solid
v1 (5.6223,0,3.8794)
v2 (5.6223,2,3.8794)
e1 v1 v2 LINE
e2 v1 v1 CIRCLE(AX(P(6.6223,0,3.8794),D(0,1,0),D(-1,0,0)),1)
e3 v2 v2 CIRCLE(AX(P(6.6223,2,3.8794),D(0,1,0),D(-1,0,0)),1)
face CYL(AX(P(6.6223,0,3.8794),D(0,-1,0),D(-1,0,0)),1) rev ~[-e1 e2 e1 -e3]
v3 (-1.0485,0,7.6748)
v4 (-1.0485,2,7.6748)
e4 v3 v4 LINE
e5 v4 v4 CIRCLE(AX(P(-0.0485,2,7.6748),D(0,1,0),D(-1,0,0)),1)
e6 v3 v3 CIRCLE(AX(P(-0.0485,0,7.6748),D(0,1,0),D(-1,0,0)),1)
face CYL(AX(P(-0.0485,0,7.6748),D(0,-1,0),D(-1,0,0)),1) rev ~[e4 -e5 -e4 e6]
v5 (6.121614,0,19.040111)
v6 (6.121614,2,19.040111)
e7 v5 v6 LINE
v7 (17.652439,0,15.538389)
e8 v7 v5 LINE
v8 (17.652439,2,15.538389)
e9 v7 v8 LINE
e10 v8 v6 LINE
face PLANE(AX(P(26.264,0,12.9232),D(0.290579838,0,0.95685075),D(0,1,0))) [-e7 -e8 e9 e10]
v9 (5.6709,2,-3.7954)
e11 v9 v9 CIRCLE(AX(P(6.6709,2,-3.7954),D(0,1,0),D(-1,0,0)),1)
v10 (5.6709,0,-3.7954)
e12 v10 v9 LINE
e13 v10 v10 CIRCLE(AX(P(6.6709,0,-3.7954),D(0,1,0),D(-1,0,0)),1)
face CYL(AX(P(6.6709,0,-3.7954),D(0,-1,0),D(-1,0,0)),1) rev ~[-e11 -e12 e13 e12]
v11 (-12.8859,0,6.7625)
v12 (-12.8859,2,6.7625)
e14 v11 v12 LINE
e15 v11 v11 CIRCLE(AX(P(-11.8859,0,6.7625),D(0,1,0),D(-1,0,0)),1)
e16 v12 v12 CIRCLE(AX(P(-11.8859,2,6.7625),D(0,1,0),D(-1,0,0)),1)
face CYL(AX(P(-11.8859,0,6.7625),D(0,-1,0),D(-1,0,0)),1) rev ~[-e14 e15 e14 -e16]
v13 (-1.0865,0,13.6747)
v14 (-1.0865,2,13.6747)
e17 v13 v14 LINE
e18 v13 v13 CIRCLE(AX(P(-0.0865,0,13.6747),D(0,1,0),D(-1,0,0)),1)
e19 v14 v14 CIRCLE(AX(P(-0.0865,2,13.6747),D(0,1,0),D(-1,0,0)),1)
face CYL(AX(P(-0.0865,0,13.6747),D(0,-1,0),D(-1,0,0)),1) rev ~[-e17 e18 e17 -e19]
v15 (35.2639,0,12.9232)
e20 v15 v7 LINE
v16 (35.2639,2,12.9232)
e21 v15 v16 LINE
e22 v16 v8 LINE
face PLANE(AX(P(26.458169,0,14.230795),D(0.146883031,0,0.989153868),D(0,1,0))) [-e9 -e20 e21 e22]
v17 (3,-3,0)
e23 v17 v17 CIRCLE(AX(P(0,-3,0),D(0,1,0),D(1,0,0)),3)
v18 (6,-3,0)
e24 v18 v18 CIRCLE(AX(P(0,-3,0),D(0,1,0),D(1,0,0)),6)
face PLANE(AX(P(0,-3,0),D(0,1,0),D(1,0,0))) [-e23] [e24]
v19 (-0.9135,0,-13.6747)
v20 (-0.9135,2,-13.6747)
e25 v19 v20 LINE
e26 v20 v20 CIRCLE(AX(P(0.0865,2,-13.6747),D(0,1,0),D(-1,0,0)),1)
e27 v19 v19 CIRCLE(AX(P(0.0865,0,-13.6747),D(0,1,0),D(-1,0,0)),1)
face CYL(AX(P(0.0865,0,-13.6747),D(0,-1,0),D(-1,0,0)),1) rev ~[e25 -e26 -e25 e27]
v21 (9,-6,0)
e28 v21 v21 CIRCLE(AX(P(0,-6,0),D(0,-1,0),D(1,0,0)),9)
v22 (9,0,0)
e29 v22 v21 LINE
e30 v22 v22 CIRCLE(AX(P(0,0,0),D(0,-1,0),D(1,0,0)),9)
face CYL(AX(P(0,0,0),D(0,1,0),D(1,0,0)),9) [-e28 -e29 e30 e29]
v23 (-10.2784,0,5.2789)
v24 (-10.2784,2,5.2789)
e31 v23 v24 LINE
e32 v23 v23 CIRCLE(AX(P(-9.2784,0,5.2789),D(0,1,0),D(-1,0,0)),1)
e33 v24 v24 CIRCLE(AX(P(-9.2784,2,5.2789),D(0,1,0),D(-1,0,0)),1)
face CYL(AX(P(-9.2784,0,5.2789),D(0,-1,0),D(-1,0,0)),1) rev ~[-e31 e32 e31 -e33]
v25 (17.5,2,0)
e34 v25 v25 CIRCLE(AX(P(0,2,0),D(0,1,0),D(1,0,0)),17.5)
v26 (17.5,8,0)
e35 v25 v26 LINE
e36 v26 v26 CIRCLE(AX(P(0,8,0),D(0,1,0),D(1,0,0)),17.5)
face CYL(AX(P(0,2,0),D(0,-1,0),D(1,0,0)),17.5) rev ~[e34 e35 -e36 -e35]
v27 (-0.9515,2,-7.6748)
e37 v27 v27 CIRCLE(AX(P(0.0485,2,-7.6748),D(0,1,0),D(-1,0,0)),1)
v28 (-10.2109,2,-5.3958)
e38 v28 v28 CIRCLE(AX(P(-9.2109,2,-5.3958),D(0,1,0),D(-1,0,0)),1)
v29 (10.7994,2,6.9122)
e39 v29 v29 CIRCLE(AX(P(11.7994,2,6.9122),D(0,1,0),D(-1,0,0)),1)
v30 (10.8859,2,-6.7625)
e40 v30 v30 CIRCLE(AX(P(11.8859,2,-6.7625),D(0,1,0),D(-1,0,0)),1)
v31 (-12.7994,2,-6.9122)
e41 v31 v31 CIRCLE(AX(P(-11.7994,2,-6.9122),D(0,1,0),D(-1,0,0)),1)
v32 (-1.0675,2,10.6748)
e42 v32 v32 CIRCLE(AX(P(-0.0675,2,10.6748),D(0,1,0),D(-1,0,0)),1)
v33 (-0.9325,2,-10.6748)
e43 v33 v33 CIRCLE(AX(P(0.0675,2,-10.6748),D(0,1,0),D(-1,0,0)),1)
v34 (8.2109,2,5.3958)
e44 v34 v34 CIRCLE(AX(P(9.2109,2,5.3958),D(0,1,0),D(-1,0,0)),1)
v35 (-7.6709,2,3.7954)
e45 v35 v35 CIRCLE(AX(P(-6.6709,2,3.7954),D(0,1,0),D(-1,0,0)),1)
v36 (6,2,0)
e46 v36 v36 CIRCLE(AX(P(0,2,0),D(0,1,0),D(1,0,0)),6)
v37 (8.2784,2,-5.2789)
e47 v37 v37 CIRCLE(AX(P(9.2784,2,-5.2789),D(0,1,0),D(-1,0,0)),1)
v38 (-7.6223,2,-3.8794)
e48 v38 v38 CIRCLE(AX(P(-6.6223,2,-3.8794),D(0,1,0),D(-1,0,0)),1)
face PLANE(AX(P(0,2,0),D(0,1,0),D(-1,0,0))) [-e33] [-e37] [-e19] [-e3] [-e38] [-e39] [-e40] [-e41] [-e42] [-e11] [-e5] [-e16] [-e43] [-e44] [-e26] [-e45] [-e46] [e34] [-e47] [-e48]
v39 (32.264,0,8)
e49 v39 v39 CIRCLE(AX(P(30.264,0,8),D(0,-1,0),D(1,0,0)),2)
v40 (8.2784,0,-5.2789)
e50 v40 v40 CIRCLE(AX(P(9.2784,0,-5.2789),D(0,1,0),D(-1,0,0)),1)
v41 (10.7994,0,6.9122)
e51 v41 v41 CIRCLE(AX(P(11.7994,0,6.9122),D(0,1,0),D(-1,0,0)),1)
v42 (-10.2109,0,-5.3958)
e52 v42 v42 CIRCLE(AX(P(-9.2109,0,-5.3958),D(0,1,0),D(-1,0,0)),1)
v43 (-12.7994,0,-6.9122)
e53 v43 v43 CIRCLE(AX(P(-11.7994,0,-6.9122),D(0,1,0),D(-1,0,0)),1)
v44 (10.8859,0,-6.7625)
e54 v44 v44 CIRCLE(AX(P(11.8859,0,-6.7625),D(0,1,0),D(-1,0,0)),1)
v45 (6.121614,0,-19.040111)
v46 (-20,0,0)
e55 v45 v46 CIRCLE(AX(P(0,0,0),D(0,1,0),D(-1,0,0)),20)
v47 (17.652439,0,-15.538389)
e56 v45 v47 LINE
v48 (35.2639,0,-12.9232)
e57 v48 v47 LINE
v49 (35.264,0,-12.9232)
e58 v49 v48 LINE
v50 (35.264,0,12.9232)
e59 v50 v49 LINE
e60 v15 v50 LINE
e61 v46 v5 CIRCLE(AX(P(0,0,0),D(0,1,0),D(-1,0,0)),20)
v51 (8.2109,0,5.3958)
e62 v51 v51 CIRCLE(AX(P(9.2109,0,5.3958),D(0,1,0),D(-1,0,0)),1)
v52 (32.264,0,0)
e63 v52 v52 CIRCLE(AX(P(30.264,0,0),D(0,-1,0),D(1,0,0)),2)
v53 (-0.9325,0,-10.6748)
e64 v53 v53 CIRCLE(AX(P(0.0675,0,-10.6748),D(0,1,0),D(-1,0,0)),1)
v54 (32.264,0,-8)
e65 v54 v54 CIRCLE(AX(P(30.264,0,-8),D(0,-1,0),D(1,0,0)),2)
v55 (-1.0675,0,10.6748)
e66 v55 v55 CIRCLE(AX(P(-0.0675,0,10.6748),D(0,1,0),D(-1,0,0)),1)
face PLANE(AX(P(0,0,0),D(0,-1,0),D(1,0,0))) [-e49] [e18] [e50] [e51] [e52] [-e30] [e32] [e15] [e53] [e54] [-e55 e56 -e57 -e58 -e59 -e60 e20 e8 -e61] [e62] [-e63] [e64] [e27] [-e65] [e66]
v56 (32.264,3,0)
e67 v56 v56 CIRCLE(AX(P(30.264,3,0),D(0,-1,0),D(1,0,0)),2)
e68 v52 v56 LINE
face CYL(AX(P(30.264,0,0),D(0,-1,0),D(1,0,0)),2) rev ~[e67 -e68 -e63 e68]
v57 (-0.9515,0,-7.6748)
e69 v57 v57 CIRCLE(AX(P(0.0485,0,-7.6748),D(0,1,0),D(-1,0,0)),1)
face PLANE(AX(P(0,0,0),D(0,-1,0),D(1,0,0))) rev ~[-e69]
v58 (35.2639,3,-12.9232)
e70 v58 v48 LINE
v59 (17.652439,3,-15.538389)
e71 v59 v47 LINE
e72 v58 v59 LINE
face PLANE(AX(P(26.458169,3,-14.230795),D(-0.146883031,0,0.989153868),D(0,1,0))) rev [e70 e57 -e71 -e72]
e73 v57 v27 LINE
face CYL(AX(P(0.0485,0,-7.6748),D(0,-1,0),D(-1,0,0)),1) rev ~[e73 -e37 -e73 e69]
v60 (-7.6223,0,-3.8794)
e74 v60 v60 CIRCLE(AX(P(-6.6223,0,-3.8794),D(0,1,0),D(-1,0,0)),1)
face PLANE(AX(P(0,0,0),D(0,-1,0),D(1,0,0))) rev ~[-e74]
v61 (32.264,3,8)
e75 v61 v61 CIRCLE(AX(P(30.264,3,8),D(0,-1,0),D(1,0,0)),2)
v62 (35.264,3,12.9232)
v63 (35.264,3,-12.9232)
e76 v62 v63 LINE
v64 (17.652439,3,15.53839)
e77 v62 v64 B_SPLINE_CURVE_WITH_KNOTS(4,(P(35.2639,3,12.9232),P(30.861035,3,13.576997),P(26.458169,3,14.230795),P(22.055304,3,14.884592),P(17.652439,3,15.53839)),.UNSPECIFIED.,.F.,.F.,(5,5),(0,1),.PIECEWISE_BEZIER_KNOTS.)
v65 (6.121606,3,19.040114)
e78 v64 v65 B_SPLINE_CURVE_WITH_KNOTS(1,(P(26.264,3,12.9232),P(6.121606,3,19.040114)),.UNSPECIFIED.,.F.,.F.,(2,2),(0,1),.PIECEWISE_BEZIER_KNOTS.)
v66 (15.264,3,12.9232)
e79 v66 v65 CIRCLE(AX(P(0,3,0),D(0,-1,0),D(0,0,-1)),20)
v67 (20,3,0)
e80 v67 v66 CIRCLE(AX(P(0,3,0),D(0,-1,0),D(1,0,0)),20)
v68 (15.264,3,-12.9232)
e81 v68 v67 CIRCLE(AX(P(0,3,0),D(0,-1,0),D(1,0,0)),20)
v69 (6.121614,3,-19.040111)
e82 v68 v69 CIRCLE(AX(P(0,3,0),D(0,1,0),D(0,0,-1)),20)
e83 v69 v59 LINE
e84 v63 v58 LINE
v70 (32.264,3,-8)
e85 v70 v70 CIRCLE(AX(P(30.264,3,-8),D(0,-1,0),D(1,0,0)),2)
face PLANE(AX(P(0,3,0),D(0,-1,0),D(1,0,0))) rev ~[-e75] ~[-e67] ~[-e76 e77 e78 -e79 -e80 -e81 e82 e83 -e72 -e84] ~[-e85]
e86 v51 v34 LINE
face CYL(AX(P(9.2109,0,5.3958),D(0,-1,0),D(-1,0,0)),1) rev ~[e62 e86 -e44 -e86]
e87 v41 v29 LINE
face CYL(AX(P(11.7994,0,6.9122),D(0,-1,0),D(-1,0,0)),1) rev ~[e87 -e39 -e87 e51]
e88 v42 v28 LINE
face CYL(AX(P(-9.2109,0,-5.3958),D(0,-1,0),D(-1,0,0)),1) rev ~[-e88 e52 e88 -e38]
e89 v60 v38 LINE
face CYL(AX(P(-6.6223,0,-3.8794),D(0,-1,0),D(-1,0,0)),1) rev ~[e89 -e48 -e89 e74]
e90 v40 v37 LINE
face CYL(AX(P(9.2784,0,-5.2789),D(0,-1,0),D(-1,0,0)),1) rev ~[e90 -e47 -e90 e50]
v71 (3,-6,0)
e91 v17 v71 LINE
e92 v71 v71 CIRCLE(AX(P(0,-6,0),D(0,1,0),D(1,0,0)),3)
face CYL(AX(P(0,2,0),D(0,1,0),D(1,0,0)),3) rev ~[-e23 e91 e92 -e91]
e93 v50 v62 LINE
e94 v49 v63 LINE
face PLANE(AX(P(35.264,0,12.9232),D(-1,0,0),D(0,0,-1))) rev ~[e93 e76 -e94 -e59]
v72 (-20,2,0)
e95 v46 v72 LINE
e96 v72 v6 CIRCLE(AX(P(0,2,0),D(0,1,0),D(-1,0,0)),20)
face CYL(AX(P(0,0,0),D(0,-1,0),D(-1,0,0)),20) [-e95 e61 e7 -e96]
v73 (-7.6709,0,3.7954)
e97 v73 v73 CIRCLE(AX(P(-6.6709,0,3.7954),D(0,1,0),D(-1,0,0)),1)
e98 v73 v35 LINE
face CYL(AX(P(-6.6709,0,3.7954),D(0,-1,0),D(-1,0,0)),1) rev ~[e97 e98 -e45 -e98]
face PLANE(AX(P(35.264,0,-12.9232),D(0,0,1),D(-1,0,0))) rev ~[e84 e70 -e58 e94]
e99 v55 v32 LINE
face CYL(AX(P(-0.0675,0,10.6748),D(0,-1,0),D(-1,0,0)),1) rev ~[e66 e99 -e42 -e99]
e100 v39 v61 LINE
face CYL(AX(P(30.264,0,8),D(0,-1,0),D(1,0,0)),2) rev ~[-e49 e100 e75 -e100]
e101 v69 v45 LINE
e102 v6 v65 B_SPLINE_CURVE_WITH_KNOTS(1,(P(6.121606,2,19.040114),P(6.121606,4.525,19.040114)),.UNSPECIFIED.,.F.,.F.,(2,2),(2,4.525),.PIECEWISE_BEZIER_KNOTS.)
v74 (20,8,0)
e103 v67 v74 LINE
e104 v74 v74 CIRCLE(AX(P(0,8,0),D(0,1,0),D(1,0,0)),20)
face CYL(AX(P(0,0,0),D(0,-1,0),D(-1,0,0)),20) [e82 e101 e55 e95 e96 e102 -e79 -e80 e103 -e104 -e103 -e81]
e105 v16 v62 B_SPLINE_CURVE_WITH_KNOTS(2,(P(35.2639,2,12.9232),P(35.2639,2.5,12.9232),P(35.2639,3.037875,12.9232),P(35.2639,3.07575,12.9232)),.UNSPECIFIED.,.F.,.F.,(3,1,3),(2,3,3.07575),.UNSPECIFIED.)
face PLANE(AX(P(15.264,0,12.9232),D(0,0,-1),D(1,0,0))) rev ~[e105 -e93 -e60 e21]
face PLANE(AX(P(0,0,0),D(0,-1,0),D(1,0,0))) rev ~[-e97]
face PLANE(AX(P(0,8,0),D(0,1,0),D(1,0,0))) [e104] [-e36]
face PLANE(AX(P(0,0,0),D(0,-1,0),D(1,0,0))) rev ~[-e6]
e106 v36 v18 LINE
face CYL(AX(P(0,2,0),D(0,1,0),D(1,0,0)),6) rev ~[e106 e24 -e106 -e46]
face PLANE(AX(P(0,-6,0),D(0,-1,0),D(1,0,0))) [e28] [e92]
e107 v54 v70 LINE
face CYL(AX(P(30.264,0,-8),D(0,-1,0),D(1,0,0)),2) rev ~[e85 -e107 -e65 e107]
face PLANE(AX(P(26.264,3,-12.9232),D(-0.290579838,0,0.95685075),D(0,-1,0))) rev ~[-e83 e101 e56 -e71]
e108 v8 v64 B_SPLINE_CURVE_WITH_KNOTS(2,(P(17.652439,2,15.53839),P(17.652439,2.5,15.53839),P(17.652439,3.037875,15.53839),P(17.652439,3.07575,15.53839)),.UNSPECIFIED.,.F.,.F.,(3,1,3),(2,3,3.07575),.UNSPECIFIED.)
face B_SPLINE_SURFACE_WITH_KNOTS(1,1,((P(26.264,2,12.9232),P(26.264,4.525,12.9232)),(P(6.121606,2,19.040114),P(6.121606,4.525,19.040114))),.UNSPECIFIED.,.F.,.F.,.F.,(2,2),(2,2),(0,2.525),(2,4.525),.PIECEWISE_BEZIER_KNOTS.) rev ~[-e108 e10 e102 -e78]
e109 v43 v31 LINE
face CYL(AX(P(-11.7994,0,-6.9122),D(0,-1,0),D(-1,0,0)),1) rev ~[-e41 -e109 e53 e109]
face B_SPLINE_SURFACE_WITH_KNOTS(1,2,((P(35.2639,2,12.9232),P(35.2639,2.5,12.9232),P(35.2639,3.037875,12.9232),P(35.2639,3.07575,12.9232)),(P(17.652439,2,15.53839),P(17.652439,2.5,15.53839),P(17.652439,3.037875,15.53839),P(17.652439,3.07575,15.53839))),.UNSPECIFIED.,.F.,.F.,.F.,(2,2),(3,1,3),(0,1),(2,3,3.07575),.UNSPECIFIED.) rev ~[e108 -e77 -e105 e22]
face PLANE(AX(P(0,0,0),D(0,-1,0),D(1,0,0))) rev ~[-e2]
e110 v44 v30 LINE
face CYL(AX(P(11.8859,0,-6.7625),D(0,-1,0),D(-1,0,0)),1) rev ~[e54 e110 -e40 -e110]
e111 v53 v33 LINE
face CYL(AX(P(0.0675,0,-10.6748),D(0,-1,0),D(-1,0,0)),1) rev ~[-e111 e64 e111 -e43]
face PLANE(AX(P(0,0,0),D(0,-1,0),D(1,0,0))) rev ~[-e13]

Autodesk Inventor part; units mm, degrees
ref_plane "YZ Plane" through (0, 0, 0) normal (1, 0, 0) x (0, 1, 0)
ref_plane "XZ Plane" through (0, 0, 0) normal (0, 1, 0) x (-1, 0, 0)
ref_plane "XY Plane" through (0, 0, 0) normal (0, 0, 1) x (1, 0, 0)
sketch "Эскиз1" plane through (0, 0, 0) normal (0, 1, 0) x (-1, 0, 0)
  arc A0 (13.2517, 5.1196) -> (11.6396, 8.8847) centre (11.8859, 6.7625) ccw
  line L0 (11.6396, 8.8847) -> (3.5765, 5.9707)
  line L1 (3.5765, 5.9707) -> (2.1921, 14.0362)
  arc A1 (2.1921, 14.0362) -> (-1.8746, 14.5225) centre (0.0865, 13.6747) ccw
  line L2 (-1.8746, 14.5225) -> (-3.3825, 6.0827)
  line L3 (-3.3825, 6.0827) -> (-11.0596, 8.9165)
  arc A2 (-11.0596, 8.9165) -> (-13.5142, 5.6378) centre (-11.7994, 6.9122) ccw
  line L4 (-13.5142, 5.6378) -> (-6.959, 0.112)
  line L5 (-6.959, 0.112) -> (-13.2517, -5.1196)
  arc A3 (-13.2517, -5.1196) -> (-11.6396, -8.8847) centre (-11.8859, -6.7625) ccw
  line L6 (-11.6396, -8.8847) -> (-3.5765, -5.9707)
  line L7 (-3.5765, -5.9707) -> (-2.1921, -14.0362)
  arc A4 (-2.1921, -14.0362) -> (1.8746, -14.5225) centre (-0.0865, -13.6747) ccw
  line L8 (1.8746, -14.5225) -> (3.3825, -6.0827)
  line L9 (3.3825, -6.0827) -> (11.0596, -8.9165)
  arc A5 (11.0596, -8.9165) -> (13.5142, -5.6378) centre (11.7994, -6.9122) ccw
  line L10 (13.5142, -5.6378) -> (6.959, -0.112)
  line L11 (6.959, -0.112) -> (13.2517, 5.1196)
  circle A6 centre (6.6709, 3.7954) radius 1
  circle A7 centre (11.8859, 6.7625) radius 1
  circle A8 centre (9.2109, -5.3958) radius 1
  circle A9 centre (-0.0485, -7.6748) radius 1
  circle A10 centre (-0.0865, -13.6747) radius 1
  circle A11 centre (-9.2784, -5.2789) radius 1
  circle A12 centre (-6.6223, 3.8794) radius 1
  circle A13 centre (-11.7994, 6.9122) radius 1
  circle A14 centre (0.0675, 10.6748) radius 1
  circle A15 centre (0, 0) radius 4.75
  circle A16 centre (0.0865, 13.6747) radius 1
  circle A17 centre (0.0485, 7.6748) radius 1
  circle A18 centre (-9.2109, 5.3958) radius 1
  circle A19 centre (-11.8859, -6.7625) radius 1
  circle A20 centre (-6.6709, -3.7954) radius 1
  circle A21 centre (-0.0675, -10.6748) radius 1
  circle A22 centre (11.7994, -6.9122) radius 1
  circle A23 centre (6.6223, -3.8794) radius 1
  circle A24 centre (9.2784, 5.2789) radius 1
  circle A25 centre (0, 0) radius 1.875
  circle A26 centre (0, 0) radius 20
  circle A27 centre (0, 0) radius 17.5
  point P0 (0, 0)
  dimension "d0" = 40
  dimension "d1" = 35
extrude "Выдавливание1" add sketch "Эскиз1" along normal blind 2 contours L11 L10 A5 L9 L8 A4 L7 L6 A3 L5 L4 A2 L3 L2 A1 L1 L0 A0 | A26 | A27
sketch "Эскиз2" plane through (0, 2, 0) normal (0, 1, 0) x (1, 0, 0)
  arc A0 (13.2517, 5.1196) -> (11.6396, 8.8847) centre (11.8859, 6.7625) ccw
  line L0 (11.6396, 8.8847) -> (3.5765, 5.9707)
  line L1 (3.5765, 5.9707) -> (2.1921, 14.0362)
  arc A1 (2.1921, 14.0362) -> (-1.8746, 14.5225) centre (0.0865, 13.6747) ccw
  line L2 (-1.8746, 14.5225) -> (-3.3825, 6.0827)
  line L3 (-3.3825, 6.0827) -> (-11.0596, 8.9165)
  arc A2 (-11.0596, 8.9165) -> (-13.5142, 5.6378) centre (-11.7994, 6.9122) ccw
  line L4 (-13.5142, 5.6378) -> (-6.959, 0.112)
  line L5 (-6.959, 0.112) -> (-13.2517, -5.1196)
  arc A3 (-13.2517, -5.1196) -> (-11.6396, -8.8847) centre (-11.8859, -6.7625) ccw
  line L6 (-11.6396, -8.8847) -> (-3.5765, -5.9707)
  line L7 (-3.5765, -5.9707) -> (-2.1921, -14.0362)
  arc A4 (-2.1921, -14.0362) -> (1.8746, -14.5225) centre (-0.0865, -13.6747) ccw
  line L8 (1.8746, -14.5225) -> (3.3825, -6.0827)
  line L9 (3.3825, -6.0827) -> (11.0596, -8.9165)
  arc A5 (11.0596, -8.9165) -> (13.5142, -5.6378) centre (11.7994, -6.9122) ccw
  line L10 (13.5142, -5.6378) -> (6.959, -0.112)
  line L11 (6.959, -0.112) -> (13.2517, 5.1196)
  circle A6 centre (6.6709, 3.7954) radius 1
  circle A7 centre (11.8859, 6.7625) radius 1
  circle A8 centre (9.2109, -5.3958) radius 1
  circle A9 centre (-0.0485, -7.6748) radius 1
  circle A10 centre (-0.0865, -13.6747) radius 1
  circle A11 centre (-9.2784, -5.2789) radius 1
  circle A12 centre (-6.6223, 3.8794) radius 1
  circle A13 centre (-11.7994, 6.9122) radius 1
  circle A14 centre (0.0675, 10.6748) radius 1
  circle A15 centre (0, 0) radius 4.75
  circle A16 centre (0.0865, 13.6747) radius 1
  circle A17 centre (0.0485, 7.6748) radius 1
  circle A18 centre (-9.2109, 5.3958) radius 1
  circle A19 centre (-11.8859, -6.7625) radius 1
  circle A20 centre (-6.6709, -3.7954) radius 1
  circle A21 centre (-0.0675, -10.6748) radius 1
  circle A22 centre (11.7994, -6.9122) radius 1
  circle A23 centre (6.6223, -3.8794) radius 1
  circle A24 centre (9.2784, 5.2789) radius 1
  circle A25 centre (0, 0) radius 1.875
  circle A26 centre (0, 0) radius 20
  circle A27 centre (0, 0) radius 17.5
  point P0 (0, 0)
  dimension "d4" = 40
  dimension "d5" = 35
extrude "Выдавливание2" add sketch "Эскиз2" along normal blind 6 contours A26
sketch "Эскиз3" plane through (0, 0, 0) normal (0, -1, 0) x (1, 0, 0)
  circle A0 centre (0, 0) radius 20 projected
  line L0 (15.264, 12.9232) -> (15.264, -12.9232)
  line L1 (15.264, 12.9232) -> (35.264, 12.9232)
  line L2 (35.264, 12.9232) -> (35.264, -12.9232)
  line L3 (35.264, -12.9232) -> (15.264, -12.9232)
  line L4 (15.264, -12.9232) -> (15.264, 12.9232)
  dimension "d8" = 20
extrude "Выдавливание3" add sketch "Эскиз3" against normal blind 3 contours A0 L1 L2 L3
sketch "Эскиз4" plane through (0, 0, 0) normal (0, -1, 0) x (1, 0, 0)
  line L0 (35.264, 12.9232) -> (35.264, -12.9232) projected
  line L1 (35.264, 0) -> (30.264, 0)
  circle A0 centre (30.264, 0) radius 2
  point P0 (0, 0)
  dimension "d17" = 5
  dimension "d18" = 4
extrude "Выдавливание4" cut sketch "Эскиз4" against normal blind 4
sketch "Эскиз5" plane through (0, 0, 0) normal (0, -1, 0) x (1, 0, 0)
  circle A0 centre (0, 0) radius 9
  dimension "d24" = 18
extrude "Выдавливание5" add sketch "Эскиз5" along normal blind 6
sketch "Эскиз6" plane through (0, 2, 0) normal (0, 1, 0) x (1, 0, 0)
  circle A0 centre (0, 0) radius 3
  dimension "d27" = 6
extrude "Выдавливание6" cut sketch "Эскиз6" against normal through all
sketch "Эскиз7" plane through (0, 2, 0) normal (0, 1, 0) x (1, 0, 0)
  circle A0 centre (0, 0) radius 6
  dimension "d30" = 12
extrude "Выдавливание7" cut sketch "Эскиз7" against normal blind 5
pattern_linear "Прямоуг.массив2" count 3 spacing 8 along (0, 0, -1) of "Выдавливание4" first direction both ways yes
chamfer "Фаска3" distance 11 angle 45 3 edges at (15.264, 1.5, -12.9232) (15.264, 1, 12.9232) (15.264, 2.5, 12.9232)
chamfer "Фаска4" distance 9 angle 45 2 edges at (26.264, 2.5, 12.9232) (26.264, 1.5, -12.9232)
properties part number "000.403 - Рычаг" material "Пластик АБС"
